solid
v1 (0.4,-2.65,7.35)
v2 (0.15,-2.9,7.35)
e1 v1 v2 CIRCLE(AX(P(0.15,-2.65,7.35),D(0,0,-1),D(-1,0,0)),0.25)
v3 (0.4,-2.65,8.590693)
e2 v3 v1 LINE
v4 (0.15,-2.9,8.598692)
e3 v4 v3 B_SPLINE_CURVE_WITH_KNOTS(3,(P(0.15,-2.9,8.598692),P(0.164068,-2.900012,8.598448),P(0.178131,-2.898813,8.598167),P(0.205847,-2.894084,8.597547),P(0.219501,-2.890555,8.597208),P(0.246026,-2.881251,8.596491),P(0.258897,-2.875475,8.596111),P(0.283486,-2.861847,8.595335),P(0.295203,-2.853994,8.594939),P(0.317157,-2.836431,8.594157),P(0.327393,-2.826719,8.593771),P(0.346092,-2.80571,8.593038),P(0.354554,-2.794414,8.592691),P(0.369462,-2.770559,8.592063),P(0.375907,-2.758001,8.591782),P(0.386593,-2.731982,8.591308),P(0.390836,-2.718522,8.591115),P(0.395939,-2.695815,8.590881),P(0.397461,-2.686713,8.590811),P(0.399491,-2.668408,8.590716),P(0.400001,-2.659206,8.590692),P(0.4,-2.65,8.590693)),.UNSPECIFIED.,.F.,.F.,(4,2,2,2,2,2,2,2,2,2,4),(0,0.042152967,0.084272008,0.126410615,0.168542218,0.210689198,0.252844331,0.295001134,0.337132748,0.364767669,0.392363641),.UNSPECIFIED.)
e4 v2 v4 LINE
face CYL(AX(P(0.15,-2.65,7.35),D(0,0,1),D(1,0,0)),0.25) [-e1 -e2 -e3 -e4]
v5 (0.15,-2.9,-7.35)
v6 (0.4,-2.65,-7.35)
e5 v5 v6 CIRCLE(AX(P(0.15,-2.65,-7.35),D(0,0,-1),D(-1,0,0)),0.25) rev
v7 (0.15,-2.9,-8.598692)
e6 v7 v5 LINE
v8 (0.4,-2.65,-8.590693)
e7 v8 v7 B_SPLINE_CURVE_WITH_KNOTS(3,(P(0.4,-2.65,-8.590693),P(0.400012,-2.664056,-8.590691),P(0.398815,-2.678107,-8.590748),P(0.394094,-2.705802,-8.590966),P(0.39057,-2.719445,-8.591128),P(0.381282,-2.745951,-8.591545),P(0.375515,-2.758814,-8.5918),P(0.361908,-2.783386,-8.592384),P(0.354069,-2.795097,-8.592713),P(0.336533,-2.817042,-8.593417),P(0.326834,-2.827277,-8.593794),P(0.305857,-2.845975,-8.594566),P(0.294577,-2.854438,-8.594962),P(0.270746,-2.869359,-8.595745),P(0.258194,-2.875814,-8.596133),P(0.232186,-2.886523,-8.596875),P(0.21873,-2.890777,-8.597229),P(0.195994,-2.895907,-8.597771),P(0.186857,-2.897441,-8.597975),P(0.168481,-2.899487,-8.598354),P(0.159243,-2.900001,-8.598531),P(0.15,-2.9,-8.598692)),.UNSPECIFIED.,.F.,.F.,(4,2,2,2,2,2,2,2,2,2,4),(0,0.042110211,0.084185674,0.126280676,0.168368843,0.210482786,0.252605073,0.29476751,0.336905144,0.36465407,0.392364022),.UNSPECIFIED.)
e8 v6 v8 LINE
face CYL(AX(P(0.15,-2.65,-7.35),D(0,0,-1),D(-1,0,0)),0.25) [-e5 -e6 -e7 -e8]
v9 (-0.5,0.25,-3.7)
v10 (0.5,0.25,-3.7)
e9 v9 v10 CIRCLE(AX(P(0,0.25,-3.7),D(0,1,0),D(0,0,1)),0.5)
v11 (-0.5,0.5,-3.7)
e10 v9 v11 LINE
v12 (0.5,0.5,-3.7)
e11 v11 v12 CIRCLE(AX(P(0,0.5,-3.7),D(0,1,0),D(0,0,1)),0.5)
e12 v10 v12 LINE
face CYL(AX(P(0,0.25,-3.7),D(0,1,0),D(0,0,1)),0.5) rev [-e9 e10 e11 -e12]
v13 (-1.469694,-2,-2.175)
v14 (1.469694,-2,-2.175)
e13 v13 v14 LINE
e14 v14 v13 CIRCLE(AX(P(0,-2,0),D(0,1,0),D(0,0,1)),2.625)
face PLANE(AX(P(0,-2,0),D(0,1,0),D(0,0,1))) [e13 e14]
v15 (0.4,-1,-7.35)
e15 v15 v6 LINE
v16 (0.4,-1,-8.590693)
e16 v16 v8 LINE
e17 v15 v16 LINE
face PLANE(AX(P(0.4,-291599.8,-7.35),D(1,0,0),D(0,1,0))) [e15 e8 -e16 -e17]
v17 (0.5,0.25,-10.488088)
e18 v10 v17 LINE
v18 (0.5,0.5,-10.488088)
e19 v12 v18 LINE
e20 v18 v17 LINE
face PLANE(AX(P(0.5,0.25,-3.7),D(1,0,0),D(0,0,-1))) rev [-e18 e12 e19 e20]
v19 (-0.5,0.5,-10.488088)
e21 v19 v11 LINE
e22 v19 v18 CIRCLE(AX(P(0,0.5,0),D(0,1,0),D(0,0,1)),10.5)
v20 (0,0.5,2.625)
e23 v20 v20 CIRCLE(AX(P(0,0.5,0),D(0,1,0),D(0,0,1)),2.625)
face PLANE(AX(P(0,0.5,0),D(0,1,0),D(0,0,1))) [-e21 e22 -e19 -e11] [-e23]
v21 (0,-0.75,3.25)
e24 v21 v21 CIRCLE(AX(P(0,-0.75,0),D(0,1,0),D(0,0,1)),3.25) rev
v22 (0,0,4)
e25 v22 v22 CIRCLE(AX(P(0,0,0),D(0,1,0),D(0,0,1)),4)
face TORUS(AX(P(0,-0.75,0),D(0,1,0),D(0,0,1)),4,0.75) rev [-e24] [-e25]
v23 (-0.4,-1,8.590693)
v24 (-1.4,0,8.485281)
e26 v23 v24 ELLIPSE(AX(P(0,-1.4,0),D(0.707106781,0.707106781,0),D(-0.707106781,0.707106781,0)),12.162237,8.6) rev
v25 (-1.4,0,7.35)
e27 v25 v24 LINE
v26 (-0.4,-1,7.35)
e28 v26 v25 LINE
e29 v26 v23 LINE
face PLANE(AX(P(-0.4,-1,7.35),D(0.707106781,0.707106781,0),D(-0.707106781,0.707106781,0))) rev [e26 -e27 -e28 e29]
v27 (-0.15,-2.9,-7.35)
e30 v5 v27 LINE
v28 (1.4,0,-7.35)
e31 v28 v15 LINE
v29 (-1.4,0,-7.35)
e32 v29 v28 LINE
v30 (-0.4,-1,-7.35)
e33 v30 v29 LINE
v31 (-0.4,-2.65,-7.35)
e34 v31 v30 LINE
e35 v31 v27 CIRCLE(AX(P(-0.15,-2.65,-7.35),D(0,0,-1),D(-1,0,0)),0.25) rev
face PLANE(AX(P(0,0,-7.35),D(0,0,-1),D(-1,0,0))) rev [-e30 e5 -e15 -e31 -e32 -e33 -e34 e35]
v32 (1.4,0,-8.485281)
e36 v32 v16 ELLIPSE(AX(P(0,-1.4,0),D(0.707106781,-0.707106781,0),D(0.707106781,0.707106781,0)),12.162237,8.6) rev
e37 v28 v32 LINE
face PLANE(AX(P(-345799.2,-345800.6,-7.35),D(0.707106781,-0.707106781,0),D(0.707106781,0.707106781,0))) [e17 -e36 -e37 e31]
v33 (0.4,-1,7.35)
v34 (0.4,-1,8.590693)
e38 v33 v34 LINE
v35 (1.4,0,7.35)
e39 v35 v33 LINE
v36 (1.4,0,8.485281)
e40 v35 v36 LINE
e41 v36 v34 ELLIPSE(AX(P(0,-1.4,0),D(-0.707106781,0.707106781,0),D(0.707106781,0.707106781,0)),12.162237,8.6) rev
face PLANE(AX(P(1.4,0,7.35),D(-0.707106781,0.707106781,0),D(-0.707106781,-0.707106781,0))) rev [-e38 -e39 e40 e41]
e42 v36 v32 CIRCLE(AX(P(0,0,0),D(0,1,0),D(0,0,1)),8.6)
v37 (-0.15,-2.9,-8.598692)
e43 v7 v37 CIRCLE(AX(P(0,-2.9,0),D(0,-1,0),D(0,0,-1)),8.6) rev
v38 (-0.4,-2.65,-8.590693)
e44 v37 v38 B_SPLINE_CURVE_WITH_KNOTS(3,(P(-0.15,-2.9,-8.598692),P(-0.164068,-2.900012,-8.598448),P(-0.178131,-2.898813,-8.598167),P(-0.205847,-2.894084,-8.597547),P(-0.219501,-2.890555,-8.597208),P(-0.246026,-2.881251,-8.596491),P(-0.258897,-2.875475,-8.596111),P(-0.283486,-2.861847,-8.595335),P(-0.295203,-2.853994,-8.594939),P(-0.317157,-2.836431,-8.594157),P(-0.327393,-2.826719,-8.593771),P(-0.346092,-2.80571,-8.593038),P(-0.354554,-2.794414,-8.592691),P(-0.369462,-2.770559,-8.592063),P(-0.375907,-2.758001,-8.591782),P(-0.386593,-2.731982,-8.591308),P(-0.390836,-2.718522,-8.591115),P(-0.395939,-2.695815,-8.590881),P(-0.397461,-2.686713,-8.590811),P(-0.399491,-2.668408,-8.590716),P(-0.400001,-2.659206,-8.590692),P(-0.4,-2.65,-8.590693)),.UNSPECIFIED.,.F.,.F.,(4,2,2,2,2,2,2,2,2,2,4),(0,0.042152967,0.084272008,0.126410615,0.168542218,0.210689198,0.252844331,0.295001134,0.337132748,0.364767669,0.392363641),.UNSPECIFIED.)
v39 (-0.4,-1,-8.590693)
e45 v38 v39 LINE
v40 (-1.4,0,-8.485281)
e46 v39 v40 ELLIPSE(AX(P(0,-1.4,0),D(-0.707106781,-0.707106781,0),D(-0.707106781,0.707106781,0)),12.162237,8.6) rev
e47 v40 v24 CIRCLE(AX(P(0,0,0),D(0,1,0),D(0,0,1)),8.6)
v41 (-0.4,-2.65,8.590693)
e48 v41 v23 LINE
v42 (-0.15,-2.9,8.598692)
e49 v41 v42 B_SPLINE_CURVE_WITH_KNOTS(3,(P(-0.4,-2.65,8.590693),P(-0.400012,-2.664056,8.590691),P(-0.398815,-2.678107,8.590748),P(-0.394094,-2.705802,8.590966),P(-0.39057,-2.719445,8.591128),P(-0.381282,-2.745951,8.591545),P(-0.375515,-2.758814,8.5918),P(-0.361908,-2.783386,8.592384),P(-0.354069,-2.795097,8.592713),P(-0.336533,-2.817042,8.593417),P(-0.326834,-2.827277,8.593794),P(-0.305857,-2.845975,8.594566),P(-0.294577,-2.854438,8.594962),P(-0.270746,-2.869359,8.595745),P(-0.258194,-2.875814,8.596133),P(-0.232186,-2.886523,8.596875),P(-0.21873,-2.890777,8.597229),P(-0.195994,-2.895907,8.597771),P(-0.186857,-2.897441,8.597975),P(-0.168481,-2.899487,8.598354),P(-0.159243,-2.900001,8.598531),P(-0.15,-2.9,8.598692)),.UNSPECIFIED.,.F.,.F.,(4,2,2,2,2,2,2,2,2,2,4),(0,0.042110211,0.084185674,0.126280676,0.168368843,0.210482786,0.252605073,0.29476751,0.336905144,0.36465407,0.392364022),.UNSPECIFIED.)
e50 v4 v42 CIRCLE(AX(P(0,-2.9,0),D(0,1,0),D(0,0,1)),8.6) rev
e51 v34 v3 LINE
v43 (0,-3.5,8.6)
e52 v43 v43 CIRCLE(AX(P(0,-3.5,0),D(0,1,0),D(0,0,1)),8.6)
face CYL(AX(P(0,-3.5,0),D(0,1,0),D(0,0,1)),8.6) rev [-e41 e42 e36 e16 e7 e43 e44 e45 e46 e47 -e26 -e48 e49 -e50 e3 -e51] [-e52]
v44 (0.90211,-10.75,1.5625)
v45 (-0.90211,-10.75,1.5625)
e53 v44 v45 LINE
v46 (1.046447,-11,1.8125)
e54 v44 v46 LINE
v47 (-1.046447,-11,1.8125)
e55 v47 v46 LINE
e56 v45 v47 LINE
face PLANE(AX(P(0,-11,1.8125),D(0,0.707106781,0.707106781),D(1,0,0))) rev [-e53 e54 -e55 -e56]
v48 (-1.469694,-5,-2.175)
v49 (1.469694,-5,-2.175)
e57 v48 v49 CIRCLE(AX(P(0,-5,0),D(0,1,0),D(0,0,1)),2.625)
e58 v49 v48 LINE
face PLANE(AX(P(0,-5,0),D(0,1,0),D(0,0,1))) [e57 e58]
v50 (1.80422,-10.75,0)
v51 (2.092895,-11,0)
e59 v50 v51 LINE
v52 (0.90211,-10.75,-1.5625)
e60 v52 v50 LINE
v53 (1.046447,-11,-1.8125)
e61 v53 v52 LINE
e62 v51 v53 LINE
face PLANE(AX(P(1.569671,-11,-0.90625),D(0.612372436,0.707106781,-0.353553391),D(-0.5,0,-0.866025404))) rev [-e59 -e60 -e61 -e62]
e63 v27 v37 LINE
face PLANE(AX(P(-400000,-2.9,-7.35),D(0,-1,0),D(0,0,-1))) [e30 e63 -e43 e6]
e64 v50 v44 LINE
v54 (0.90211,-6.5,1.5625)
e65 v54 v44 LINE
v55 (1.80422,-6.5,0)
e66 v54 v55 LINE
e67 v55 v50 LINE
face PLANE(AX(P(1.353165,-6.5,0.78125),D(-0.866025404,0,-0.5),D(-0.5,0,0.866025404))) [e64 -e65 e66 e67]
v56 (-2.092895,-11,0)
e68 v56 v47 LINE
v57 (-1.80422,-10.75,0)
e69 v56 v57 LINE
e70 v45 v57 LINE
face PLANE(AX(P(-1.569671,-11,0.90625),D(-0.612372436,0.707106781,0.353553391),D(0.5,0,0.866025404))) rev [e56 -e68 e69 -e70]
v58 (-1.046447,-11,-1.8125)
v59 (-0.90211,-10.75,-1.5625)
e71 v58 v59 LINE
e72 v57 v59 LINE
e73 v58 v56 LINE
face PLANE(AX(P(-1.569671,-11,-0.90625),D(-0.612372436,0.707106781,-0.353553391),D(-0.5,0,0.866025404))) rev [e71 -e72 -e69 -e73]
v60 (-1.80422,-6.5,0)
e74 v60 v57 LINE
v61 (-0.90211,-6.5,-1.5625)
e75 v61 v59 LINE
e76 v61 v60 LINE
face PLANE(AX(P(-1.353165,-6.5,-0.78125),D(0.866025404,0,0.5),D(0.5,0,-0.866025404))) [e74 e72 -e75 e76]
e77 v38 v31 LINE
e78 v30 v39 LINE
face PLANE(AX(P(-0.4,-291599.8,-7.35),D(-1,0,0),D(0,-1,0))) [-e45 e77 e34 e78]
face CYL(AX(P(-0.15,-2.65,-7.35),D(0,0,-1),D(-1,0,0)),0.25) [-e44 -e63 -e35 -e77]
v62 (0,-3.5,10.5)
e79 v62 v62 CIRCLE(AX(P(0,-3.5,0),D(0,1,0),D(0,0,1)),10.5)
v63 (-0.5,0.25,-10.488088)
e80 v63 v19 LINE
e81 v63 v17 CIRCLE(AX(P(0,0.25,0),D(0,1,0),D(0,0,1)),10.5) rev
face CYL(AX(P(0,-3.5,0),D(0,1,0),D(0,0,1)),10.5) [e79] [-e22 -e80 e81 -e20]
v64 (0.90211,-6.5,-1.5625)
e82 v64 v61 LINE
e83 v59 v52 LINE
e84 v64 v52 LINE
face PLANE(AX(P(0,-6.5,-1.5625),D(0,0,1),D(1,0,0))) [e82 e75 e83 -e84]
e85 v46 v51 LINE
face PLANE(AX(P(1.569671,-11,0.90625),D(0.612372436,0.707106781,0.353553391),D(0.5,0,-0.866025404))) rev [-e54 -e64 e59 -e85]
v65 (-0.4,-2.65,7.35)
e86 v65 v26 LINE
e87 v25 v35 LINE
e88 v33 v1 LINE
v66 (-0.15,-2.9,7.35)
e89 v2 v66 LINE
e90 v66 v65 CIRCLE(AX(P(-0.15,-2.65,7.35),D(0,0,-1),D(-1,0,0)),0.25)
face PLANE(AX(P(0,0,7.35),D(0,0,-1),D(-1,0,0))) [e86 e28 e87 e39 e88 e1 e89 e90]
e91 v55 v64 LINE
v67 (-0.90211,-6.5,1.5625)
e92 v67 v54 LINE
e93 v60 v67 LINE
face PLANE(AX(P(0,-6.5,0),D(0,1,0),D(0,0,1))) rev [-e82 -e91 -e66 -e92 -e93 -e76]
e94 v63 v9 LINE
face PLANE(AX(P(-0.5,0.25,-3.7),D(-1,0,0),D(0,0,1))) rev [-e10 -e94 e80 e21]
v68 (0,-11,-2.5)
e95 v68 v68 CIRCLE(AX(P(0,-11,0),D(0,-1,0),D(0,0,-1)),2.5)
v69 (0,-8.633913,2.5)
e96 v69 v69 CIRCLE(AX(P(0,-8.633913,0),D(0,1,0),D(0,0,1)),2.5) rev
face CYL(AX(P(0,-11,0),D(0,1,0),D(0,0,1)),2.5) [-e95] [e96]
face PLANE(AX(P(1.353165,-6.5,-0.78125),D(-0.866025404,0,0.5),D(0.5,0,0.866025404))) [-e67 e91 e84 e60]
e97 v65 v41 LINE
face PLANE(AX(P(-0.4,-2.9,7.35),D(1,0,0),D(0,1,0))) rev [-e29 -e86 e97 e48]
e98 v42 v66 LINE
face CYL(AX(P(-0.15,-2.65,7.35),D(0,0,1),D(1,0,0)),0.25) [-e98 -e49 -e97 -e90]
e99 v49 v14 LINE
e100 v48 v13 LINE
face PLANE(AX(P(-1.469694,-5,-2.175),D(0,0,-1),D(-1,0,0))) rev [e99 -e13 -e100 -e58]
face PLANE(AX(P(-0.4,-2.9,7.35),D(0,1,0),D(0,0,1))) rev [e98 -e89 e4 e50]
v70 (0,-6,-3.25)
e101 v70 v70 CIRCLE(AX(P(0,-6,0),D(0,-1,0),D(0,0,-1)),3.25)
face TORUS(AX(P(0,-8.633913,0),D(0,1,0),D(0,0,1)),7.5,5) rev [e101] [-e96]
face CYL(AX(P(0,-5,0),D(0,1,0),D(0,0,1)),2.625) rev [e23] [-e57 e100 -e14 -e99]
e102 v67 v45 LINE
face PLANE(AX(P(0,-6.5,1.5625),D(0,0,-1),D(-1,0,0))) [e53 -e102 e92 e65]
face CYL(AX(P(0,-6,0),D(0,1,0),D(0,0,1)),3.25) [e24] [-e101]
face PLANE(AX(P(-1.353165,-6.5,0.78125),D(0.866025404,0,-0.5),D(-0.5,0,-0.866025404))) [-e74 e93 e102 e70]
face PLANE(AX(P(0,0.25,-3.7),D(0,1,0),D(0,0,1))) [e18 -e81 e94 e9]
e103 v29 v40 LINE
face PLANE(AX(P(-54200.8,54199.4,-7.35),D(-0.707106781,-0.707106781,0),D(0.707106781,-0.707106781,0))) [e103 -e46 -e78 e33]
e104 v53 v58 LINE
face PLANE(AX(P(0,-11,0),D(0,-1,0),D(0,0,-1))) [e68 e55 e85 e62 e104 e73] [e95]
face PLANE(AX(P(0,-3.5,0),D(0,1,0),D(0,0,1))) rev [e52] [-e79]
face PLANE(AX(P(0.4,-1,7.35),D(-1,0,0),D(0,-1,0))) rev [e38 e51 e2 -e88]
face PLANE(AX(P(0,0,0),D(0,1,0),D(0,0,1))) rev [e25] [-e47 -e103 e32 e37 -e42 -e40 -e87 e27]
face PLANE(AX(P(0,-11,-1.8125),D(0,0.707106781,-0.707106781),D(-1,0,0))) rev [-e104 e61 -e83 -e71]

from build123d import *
from build123d.topology import SkipClean

# Parameters (mm, degrees)
SKETCH1_R           = 10.5
SKETCH1_R_2         = 8.6
BOSS_EXTRUDE1_DEPTH = 3.5
BOSS_EXTRUDE2_DEPTH = 1.25
BOSS_EXTRUDE3_START = 17.2
BOSS_EXTRUDE3_DEPTH = 1.25
BOSS_EXTRUDE4_START = 0.5
SKETCH3_R           = 10.5
BOSS_EXTRUDE4_DEPTH = 0.5
SKETCH5_R           = 3.25
BOSS_EXTRUDE5_DEPTH = 6
FILLET2_R           = 0.75
CUT_EXTRUDE1_DEPTH  = 5.5
FILLET1_R           = 0.25
SKETCH7_R           = 2.625
CUT_EXTRUDE2_DEPTH  = 2.5
CUT_EXTRUDE3_DEPTH  = 0.25
SKETCH11_R          = 2.5
BOSS_EXTRUDE6_DEPTH = 5
CUT_EXTRUDE4_START  = 5
CUT_EXTRUDE4_DEPTH  = 4.5
CHAMFER2_SIZE       = 0.25
FILLET3_R           = 5


with BuildPart() as part:
    # Sketch1 → Boss-Extrude1 (new body)
    with BuildSketch(Plane(origin=(0, 0, 0), x_dir=(1, 0, 0), z_dir=(0, 1, 0))):
        with Locations(Location((0, 0, 0), (0, 0, 270))):
            Circle(SKETCH1_R)
        with Locations(Location((0, 0, 0), (0, 0, 270))):
            Circle(SKETCH1_R_2, mode=Mode.SUBTRACT)
    extrude(amount=-BOSS_EXTRUDE1_DEPTH)

    # Sketch2 → Boss-Extrude2 (add)
    with BuildSketch(Plane(origin=(0, 0, 8.6), x_dir=(-1, 0, 0), z_dir=(0, 0, -1))):
        Polygon((0.4, -2.9), (-0.4, -2.9), (-0.4, -1), (-1.4, 0), (1.4, 0), (0.4, -1), align=None)
    extrude(amount=BOSS_EXTRUDE2_DEPTH)

    # Sketch2<2> → Boss-Extrude3 (add)
    with BuildSketch(Plane(origin=(0, 0, 8.6), x_dir=(-1, 0, 0), z_dir=(0, 0, -1)).offset(BOSS_EXTRUDE3_START)):
        Polygon((0.4, -2.9), (-0.4, -2.9), (-0.4, -1), (-1.4, 0), (1.4, 0), (0.4, -1), align=None)
    extrude(amount=-BOSS_EXTRUDE3_DEPTH)

    # Sketch3 → Boss-Extrude4 (add)
    with BuildSketch(Plane(origin=(0, 0, 0), x_dir=(1, 0, 0), z_dir=(0, 1, 0)).offset(BOSS_EXTRUDE4_START)):
        with Locations(Location((0, 0, 0), (0, 0, 270))):
            Circle(SKETCH3_R)
    extrude(amount=-BOSS_EXTRUDE4_DEPTH)

    # Sketch5 → Boss-Extrude5 (add)
    with BuildSketch(Plane.XZ):
        with Locations(Location((0, 0, 0), (0, 0, 90))):
            Circle(SKETCH5_R)
    extrude(amount=BOSS_EXTRUDE5_DEPTH)

    # Fillet2
    fillet2_edges = [part.edges().sort_by_distance(p)[0] for p in [
        (0, 0, -3.25),
    ]]
    fillet(fillet2_edges, radius=FILLET2_R)

    # Sketch4 → Cut-Extrude1 (cut)
    with BuildSketch(Plane(origin=(0, 0.5, 0), x_dir=(1, 0, 0), z_dir=(0, 1, 0))):
        with BuildLine():
            Line((-1.469693846, 2.175), (1.469693846, 2.175))
            ThreePointArc((1.469693846, 2.175), (0, -2.625), (-1.469693846, 2.175))
        make_face()
    extrude(amount=-CUT_EXTRUDE1_DEPTH, mode=Mode.SUBTRACT)

    # Fillet1
    fillet1_edges = [part.edges().sort_by_distance(p)[0] for p in [
        (-0.4, -2.9, 7.970346319),
        (0.4, -2.9, 7.970346319),
        (-0.4, -2.9, -7.970346319),
        (0.4, -2.9, -7.970346319),
    ]]
    fillet(fillet1_edges, radius=FILLET1_R)

    # Sketch7 → Cut-Extrude2 (cut)
    with SkipClean():  # the faces are left unmerged after this step: merging them gives an invalid solid
        with BuildSketch(Plane(origin=(0, 0.5, 0), x_dir=(1, 0, 0), z_dir=(0, 1, 0))):
            with Locations(Location((0, 0, 0), (0, 0, 270))):
                Circle(SKETCH7_R)
        extrude(amount=-CUT_EXTRUDE2_DEPTH, mode=Mode.SUBTRACT)

    # Sketch9 → Cut-Extrude3 (cut)
    with SkipClean():  # the faces are left unmerged after this step: merging them gives an invalid solid
        with BuildSketch(Plane(origin=(0, 0.5, 0), x_dir=(1, 0, 0), z_dir=(0, 1, 0))):
            with BuildLine():
                Line((-0.5, 3.7), (-0.5, 13.7))
                ThreePointArc((-0.5, 13.7), (0, 14.2), (0.5, 13.7))
                Line((0.5, 13.7), (0.5, 3.7))
                ThreePointArc((0.5, 3.7), (0, 3.2), (-0.5, 3.7))
            make_face()
        extrude(amount=-CUT_EXTRUDE3_DEPTH, mode=Mode.SUBTRACT)

    # Sketch11 → Boss-Extrude6 (add)
    with SkipClean():  # the faces are left unmerged after this step: merging them gives an invalid solid
        with BuildSketch(Plane.XZ.offset(6)):
            with Locations(Location((0, 0, 0), (0, 0, 270))):
                Circle(SKETCH11_R)
        extrude(amount=BOSS_EXTRUDE6_DEPTH)

    # Sketch10 → Cut-Extrude4 (cut)
    with SkipClean():  # the faces are left unmerged after this step: merging them gives an invalid solid
        with BuildSketch(Plane.XZ.offset(6).offset(CUT_EXTRUDE4_START)):
            Polygon((1.804219591, 0), (0.902109796, 1.5625), (-0.902109796, 1.5625), (-1.804219591, 0), (-0.902109796, -1.5625), (0.902109796, -1.5625), align=None)
        extrude(amount=-CUT_EXTRUDE4_DEPTH, mode=Mode.SUBTRACT)

    # Chamfer2
    chamfer2_edges = [part.edges().sort_by_distance(p)[0] for p in [
        (-1.353164693, -11, -0.78125),
        (-1.353164693, -11, 0.78125),
        (0, -11, 1.5625),
        (1.353164693, -11, 0.78125),
        (1.353164693, -11, -0.78125),
        (0, -11, -1.5625),
    ]]
    chamfer(chamfer2_edges, length=CHAMFER2_SIZE)

    # Fillet3
    # the kernel refuses this fillet: 5 mm, written as the material it adds along each edge
    with BuildSketch(Plane(origin=(0, -6, 0), x_dir=(0, 0, -1), z_dir=(-1, 0, 0))) as fillet3_piece_1:
        with BuildLine():
            CenterArc((7.5, 2.633913438), FILLET3_R, 180, 31.788330617)
            Line((3.25, 0), (3.165, -0.052678269))
            ThreePointArc((3.165, -0.052678269), (2.875, -0.1), (2.5, -0.1))
            Line((2.5, -0.1), (2.4, 0))
            Line((2.4, 0), (2.4, 2.633913438))
            Line((2.4, 2.633913438), (2.5, 2.633913438))
        make_face()
    revolve(axis=Axis((0, -6, 0), (0, -1, 0)))


solid = part.part
